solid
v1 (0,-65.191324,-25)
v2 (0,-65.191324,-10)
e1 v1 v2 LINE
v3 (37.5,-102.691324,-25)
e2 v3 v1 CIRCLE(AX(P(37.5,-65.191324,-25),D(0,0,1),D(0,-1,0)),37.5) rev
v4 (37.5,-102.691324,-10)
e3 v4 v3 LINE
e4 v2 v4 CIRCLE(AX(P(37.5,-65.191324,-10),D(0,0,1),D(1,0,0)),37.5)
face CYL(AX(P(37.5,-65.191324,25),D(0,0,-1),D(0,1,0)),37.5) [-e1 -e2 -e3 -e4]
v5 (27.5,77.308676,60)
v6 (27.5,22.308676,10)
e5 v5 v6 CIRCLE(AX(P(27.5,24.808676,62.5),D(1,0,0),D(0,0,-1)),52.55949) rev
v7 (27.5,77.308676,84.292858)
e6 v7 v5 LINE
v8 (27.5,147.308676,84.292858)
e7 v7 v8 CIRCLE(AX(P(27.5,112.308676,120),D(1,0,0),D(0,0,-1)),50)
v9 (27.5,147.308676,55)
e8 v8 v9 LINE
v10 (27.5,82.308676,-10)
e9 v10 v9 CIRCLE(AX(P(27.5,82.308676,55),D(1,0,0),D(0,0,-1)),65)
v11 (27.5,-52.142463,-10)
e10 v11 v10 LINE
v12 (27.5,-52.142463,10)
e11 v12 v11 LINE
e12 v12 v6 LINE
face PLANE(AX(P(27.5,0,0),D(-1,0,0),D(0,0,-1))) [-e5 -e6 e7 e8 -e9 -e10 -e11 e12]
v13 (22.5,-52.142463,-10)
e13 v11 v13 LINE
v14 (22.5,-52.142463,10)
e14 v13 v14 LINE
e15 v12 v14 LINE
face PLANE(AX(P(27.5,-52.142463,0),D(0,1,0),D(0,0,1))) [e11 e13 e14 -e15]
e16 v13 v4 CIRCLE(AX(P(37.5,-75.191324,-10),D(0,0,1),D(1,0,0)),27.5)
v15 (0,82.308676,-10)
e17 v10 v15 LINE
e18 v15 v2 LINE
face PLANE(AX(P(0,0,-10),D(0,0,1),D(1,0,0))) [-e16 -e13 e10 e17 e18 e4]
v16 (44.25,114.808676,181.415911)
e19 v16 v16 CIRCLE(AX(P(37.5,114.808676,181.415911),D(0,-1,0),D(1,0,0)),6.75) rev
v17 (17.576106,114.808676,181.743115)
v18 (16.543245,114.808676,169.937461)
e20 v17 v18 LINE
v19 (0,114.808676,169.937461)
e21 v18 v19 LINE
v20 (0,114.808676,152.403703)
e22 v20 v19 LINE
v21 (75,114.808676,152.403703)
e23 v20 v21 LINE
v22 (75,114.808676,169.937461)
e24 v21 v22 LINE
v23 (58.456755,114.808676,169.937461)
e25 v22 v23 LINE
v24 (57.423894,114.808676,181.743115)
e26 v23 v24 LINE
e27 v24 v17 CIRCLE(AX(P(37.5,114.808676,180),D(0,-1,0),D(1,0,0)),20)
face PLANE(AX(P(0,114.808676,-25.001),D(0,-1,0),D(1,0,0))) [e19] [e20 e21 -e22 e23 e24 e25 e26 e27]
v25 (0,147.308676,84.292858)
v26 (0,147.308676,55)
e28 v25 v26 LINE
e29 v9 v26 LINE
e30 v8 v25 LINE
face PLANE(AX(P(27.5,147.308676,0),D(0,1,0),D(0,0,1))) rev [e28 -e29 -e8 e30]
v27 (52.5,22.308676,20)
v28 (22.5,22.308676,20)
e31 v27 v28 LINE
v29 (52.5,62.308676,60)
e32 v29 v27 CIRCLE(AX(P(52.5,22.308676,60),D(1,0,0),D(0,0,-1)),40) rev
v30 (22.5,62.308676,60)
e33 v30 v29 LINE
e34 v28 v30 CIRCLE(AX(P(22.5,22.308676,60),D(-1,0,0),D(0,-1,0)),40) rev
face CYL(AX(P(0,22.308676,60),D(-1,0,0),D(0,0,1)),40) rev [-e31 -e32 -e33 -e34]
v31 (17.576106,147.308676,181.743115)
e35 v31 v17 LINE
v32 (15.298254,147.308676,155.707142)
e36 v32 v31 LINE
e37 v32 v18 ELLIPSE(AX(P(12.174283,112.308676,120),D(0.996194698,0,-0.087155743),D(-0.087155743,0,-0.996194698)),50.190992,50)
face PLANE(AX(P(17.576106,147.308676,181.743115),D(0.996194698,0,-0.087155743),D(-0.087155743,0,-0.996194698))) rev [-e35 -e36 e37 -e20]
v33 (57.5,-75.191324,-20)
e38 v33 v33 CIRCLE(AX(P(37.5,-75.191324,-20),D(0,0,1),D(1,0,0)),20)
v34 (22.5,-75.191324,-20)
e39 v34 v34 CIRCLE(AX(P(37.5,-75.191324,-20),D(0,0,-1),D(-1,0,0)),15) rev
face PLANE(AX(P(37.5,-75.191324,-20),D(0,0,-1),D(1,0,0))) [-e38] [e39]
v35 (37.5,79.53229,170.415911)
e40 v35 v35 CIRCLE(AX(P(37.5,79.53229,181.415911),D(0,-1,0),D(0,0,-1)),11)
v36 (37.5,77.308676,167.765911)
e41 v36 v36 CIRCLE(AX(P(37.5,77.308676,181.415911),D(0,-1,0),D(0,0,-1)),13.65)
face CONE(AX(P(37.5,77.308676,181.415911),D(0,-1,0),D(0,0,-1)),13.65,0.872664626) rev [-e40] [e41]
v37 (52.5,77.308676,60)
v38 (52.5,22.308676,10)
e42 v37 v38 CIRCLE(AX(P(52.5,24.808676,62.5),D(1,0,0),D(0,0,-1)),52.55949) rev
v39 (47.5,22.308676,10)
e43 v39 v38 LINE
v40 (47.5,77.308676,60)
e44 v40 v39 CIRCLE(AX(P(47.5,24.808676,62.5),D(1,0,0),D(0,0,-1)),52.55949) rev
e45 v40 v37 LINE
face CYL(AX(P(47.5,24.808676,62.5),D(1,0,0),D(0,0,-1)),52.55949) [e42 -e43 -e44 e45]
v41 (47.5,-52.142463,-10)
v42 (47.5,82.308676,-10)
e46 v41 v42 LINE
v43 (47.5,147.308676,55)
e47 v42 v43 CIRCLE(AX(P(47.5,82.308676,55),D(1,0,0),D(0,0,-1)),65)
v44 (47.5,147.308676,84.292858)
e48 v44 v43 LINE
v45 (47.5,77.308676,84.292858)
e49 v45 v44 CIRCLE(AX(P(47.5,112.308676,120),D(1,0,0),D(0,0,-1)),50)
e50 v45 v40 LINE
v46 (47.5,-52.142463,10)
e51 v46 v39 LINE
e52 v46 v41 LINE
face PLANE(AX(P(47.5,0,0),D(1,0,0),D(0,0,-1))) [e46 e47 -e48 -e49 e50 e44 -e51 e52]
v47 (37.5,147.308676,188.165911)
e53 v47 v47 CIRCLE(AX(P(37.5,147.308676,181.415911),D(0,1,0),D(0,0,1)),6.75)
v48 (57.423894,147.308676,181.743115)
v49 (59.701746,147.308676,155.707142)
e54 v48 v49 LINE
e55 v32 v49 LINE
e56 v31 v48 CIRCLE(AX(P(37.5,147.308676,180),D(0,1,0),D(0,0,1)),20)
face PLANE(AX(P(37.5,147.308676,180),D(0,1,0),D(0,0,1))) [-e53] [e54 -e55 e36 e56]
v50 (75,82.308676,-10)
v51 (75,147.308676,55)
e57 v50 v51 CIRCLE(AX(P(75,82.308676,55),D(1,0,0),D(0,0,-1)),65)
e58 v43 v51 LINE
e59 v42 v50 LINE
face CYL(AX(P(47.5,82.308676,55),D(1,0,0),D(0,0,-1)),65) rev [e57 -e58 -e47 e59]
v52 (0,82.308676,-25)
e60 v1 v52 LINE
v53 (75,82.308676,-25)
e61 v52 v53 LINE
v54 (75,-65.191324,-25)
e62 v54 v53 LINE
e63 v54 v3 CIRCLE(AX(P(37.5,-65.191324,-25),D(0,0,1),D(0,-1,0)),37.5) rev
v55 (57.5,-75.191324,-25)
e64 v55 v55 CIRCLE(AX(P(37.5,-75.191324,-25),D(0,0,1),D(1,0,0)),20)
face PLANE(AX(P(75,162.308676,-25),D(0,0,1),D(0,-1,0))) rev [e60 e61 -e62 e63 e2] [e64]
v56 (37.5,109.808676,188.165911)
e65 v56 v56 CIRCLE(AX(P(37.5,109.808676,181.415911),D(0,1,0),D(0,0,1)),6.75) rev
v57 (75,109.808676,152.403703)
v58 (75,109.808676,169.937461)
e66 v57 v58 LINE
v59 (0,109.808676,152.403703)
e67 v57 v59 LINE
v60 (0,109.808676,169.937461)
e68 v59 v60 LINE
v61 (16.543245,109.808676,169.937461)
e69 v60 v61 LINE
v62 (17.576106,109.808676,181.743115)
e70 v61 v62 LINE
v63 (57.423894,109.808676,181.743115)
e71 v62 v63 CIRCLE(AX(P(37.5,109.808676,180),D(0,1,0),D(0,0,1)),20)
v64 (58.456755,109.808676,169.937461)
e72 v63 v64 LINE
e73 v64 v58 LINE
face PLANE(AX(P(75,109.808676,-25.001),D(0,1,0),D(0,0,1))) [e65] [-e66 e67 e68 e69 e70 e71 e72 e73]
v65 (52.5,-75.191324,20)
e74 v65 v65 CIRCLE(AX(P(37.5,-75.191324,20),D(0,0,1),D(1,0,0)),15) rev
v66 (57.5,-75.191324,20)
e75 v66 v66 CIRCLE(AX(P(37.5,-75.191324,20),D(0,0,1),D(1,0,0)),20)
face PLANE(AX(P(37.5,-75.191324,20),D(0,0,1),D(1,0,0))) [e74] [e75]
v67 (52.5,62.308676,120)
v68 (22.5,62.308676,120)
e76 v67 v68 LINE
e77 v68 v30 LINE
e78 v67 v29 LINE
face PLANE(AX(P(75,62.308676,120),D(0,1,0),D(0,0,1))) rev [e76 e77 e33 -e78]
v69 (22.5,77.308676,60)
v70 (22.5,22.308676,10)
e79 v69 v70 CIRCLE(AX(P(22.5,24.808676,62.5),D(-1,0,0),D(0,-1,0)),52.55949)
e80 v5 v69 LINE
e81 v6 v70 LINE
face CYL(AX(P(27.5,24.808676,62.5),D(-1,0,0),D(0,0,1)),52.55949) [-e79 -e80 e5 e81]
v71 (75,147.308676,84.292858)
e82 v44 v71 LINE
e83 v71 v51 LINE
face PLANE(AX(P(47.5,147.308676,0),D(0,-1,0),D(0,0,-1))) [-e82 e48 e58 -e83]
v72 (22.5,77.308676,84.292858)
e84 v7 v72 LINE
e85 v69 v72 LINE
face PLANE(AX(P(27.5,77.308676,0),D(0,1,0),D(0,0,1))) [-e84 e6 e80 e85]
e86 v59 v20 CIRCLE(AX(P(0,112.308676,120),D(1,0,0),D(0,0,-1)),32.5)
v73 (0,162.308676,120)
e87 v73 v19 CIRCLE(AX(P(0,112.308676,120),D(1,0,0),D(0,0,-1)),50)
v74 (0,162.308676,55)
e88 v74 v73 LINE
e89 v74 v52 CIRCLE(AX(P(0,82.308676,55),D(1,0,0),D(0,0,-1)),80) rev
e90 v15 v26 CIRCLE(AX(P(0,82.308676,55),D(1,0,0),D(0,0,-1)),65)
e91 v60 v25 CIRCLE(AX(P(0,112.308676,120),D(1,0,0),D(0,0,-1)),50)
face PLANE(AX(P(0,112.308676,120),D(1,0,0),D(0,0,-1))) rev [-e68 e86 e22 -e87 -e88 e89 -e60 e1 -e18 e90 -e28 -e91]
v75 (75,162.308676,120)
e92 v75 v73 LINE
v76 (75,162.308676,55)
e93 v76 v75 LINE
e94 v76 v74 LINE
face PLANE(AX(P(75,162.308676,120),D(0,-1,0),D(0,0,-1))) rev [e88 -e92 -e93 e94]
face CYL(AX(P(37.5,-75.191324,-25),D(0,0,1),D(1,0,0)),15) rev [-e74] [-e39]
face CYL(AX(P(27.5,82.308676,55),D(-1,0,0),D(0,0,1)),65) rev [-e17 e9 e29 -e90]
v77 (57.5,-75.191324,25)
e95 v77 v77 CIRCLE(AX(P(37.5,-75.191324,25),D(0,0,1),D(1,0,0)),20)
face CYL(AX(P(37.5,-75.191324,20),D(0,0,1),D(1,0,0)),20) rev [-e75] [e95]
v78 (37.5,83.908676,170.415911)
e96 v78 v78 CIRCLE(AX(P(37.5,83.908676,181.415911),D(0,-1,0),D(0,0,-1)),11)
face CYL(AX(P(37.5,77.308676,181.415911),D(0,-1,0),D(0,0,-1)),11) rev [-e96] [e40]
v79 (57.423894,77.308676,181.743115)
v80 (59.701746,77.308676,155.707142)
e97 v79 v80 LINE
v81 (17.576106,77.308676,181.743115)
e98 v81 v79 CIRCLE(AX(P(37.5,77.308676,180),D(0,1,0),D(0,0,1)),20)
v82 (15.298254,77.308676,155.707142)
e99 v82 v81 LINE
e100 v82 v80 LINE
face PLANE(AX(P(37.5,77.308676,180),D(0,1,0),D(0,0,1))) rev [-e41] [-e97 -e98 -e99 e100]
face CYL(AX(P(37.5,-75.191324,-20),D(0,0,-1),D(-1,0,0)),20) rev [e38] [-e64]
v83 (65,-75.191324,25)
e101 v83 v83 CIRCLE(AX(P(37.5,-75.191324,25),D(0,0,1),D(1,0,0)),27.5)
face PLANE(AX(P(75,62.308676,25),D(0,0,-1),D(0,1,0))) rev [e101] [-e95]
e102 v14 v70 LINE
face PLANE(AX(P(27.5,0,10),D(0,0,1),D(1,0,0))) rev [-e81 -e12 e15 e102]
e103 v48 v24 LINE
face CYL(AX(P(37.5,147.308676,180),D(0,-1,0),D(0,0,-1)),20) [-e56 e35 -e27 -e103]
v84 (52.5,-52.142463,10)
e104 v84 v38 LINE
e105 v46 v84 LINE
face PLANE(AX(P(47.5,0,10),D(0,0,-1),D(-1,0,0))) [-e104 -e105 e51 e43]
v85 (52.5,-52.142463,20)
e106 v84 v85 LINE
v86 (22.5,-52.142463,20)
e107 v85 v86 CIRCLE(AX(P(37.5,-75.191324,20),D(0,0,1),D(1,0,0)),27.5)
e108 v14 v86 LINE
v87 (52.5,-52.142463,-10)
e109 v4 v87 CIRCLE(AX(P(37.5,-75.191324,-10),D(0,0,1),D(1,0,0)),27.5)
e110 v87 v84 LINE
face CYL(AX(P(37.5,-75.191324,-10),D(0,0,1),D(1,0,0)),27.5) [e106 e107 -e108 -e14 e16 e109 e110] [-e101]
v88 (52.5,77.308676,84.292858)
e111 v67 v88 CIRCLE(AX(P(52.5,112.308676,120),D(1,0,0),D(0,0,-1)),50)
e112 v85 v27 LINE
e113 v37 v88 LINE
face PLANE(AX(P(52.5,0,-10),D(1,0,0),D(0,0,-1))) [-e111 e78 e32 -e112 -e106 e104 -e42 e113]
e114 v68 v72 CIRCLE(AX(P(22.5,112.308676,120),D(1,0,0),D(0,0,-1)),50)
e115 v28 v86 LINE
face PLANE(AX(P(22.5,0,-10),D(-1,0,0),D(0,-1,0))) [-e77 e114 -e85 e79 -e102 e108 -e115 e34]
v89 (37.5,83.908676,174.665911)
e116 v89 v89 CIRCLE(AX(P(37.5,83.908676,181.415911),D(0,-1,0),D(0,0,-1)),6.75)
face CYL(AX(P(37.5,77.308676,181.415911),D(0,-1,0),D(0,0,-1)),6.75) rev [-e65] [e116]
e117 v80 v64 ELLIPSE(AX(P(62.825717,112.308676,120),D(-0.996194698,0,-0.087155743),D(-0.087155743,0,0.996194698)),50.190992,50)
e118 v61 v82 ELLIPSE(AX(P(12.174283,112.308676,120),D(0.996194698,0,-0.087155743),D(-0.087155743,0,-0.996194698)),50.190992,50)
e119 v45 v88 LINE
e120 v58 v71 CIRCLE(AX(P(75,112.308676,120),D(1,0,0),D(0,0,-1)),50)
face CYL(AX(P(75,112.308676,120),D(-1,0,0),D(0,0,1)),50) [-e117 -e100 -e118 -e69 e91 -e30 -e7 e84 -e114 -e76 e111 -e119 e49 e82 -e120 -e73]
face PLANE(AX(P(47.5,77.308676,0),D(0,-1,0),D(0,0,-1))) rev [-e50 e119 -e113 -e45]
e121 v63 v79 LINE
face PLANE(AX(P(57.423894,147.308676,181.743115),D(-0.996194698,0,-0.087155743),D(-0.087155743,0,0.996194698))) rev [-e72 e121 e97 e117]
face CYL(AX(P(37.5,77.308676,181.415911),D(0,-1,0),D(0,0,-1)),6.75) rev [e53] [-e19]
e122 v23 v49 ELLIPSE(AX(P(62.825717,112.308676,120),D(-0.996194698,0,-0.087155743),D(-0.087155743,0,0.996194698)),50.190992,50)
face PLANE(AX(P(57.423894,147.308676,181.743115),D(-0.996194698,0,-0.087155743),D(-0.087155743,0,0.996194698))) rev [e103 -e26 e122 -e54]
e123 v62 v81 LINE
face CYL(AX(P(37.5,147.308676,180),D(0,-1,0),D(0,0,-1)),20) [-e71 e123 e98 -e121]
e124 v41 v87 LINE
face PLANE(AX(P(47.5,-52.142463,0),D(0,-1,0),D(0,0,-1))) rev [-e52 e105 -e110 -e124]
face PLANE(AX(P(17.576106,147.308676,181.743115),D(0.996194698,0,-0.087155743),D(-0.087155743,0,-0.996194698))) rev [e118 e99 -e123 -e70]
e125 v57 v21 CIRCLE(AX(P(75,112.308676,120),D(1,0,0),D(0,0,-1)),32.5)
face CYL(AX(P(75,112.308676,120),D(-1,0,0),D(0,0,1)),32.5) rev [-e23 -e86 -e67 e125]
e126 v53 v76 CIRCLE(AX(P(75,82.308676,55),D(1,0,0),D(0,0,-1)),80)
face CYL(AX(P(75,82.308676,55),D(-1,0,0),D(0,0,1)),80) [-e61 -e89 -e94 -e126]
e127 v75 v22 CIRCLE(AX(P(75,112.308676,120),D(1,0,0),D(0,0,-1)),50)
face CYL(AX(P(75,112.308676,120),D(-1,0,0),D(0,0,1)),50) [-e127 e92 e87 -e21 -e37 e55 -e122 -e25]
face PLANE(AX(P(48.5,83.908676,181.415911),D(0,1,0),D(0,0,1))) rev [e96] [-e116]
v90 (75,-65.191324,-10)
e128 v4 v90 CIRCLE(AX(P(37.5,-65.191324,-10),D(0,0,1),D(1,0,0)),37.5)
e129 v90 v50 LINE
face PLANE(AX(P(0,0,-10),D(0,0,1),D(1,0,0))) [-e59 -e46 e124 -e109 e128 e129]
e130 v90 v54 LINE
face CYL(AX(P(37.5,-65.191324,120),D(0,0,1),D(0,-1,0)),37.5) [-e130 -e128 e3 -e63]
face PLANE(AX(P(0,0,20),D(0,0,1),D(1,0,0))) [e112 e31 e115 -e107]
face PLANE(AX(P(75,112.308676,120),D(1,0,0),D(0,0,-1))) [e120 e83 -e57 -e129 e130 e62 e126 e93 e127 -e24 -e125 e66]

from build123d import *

# Parameters (mm, degrees)
SKETCH1_R                = 32.5
BOSS_EXTRUDE1_DEPTH      = 75
FILLET1_R                = 80
CUT_EXTRUDE3_DEPTH       = 35
FILLET2_R                = 37.5
CUT_EXTRUDE13_DEPTH      = 5
FILLET6_R                = 40
CUT_EXTRUDE14_START      = -27.5
CUT_EXTRUDE14_DEPTH      = 27.5
CUT_EXTRUDE15_START      = -22.5
CUT_EXTRUDE15_DEPTH      = 22.5
SKETCH9_R                = 15
CUT_EXTRUDE16_DEPTH      = 231.204488166
SKETCH10_R               = 20
CUT_EXTRUDE17_DEPTH      = 5
BOSS_EXTRUDE2_DEPTH      = 70
CUT_EXTRUDE20_REACH      = 289.392
CUT_EXTRUDE20_END_RADIUS = 32.5
SKETCH18_W               = 75
SKETCH18_H               = 5


with BuildPart() as part:
    # Sketch1 → Boss-Extrude1 (new body)
    with BuildSketch(Plane.YZ):
        with BuildLine():
            Line((162.308676206, -25), (-102.691323794, -25))
            Line((-102.691323794, -25), (-102.691323794, 25))
            Line((-102.691323794, 25), (62.308676206, 25))
            Line((62.308676206, 25), (62.308676206, 120))
            ThreePointArc((62.308676206, 120), (112.308676206, 170), (162.308676206, 120))
            Line((162.308676206, 120), (162.308676206, -25))
        make_face()
        with Locations(Location((112.308676206, 120, 0), (0, 0, 270))):
            Circle(SKETCH1_R, mode=Mode.SUBTRACT)
    extrude(amount=BOSS_EXTRUDE1_DEPTH)

    # Fillet1
    fillet1_edges = [part.edges().sort_by_distance(p)[0] for p in [
        (37.5, 162.308676206, -25),
    ]]
    fillet(fillet1_edges, radius=FILLET1_R)

    # Sketch3 → Cut-Extrude3 (cut)
    with BuildSketch(Plane.XY.offset(25)):
        with BuildLine():
            Line((75, 62.308676206), (52.5, 62.308676206))
            Line((52.5, 62.308676206), (52.5, -52.14246265))
            ThreePointArc((52.5, -52.14246265), (61.673849507, -62.081213191), (65, -75.191323794))
            ThreePointArc((65, -75.191323794), (56.945436483, -94.636760276), (37.5, -102.691323794))
            Line((37.5, -102.691323794), (75, -102.691323794))
            Line((75, -102.691323794), (75, 62.308676206))
        make_face()
        with BuildLine():
            Line((22.5, -52.14246265), (22.5, 62.308676206))
            Line((22.5, 62.308676206), (0, 62.308676206))
            Line((0, 62.308676206), (0, -102.691323794))
            Line((0, -102.691323794), (37.5, -102.691323794))
            ThreePointArc((37.5, -102.691323794), (11.136258977, -83.014568599), (22.5, -52.14246265))
        make_face()
    extrude(amount=-CUT_EXTRUDE3_DEPTH, mode=Mode.SUBTRACT)

    # Fillet2
    fillet2_edges = [part.edges().sort_by_distance(p)[0] for p in [
        (0, -102.691323794, -17.5),
        (75, -102.691323794, -17.5),
    ]]
    fillet(fillet2_edges, radius=FILLET2_R - 0.0001)  # a hair under: the kernel refuses the full size

    # Sketch7 → Cut-Extrude13 (cut)
    with BuildSketch(Plane.XY.offset(25)):
        with BuildLine():
            Line((52.5, 62.308676206), (22.5, 62.308676206))
            Line((22.5, 62.308676206), (22.5, -52.14246265))
            ThreePointArc((22.5, -52.14246265), (37.5, -47.691323794), (52.5, -52.14246265))
            Line((52.5, -52.14246265), (52.5, 62.308676206))
        make_face()
    extrude(amount=-CUT_EXTRUDE13_DEPTH, mode=Mode.SUBTRACT)

    # Fillet6
    fillet6_edges = [part.edges().sort_by_distance(p)[0] for p in [
        (37.5, 62.308676206, 20),
    ]]
    fillet(fillet6_edges, radius=FILLET6_R)

    # Sketch5 → Cut-Extrude14 (cut)
    with BuildSketch(Plane.YZ.offset(75).offset(CUT_EXTRUDE14_START)):
        with BuildLine():
            ThreePointArc((77.308676206, 60), (72.970807341, 41.454593742), (62.308676206, 25.672700343))
            Line((62.308676206, 25.672700343), (62.308676206, 25))
            Line((62.308676206, 25), (62.308676206, -10))
            Line((62.308676206, -10), (82.308676206, -10))
            ThreePointArc((82.308676206, -10), (128.270616984, 9.038059223), (147.308676206, 55))
            Line((147.308676206, 55), (147.308676206, 84.292857857))
            ThreePointArc((147.308676206, 84.292857857), (112.308676206, 70), (77.308676206, 84.292857857))
            Line((77.308676206, 84.292857857), (77.308676206, 60))
        make_face()
        with BuildLine():
            Line((22.308676206, 10), (-52.14246265, 10))
            Line((-52.14246265, 10), (-52.14246265, -10))
            Line((-52.14246265, -10), (62.308676206, -10))
            Line((62.308676206, -10), (62.308676206, 25))
            Line((62.308676206, 25), (62.308676206, 25.672700343))
            ThreePointArc((62.308676206, 25.672700343), (43.98309625, 13.562881), (22.308676206, 10))
        make_face()
    cut_extrude14 = extrude(amount=CUT_EXTRUDE14_DEPTH, mode=Mode.SUBTRACT)

    # Sketch8 → Cut-Extrude15 (cut)
    with BuildSketch(Plane.YZ.offset(75).offset(CUT_EXTRUDE15_START)):
        with BuildLine():
            ThreePointArc((62.308676206, 120), (66.21095392, 100.635083269), (77.308676206, 84.292857857))
            Line((77.308676206, 84.292857857), (77.308676206, 60))
            ThreePointArc((77.308676206, 60), (72.970807341, 41.454593742), (62.308676206, 25.672700343))
            Line((62.308676206, 25.672700343), (62.308676206, 120))
        make_face()
    cut_extrude15 = extrude(amount=CUT_EXTRUDE15_DEPTH, mode=Mode.SUBTRACT)

    # Mirror2: Cut-Extrude14, Cut-Extrude15 across plane
    add(cut_extrude14.mirror(Plane(origin=(37.5, 0, 0), x_dir=(0, 0, 1), z_dir=(1, 0, 0))), mode=Mode.SUBTRACT)
    add(cut_extrude15.mirror(Plane(origin=(37.5, 0, 0), x_dir=(0, 0, 1), z_dir=(1, 0, 0))), mode=Mode.SUBTRACT)

    # Sketch9 → Cut-Extrude16 (cut, through all)
    with BuildSketch(Plane.XY.offset(25)):
        with Locations((37.5, -75.191323794)):
            Circle(SKETCH9_R)
    cut_extrude16 = extrude(amount=-CUT_EXTRUDE16_DEPTH, mode=Mode.SUBTRACT)

    # Sketch10 → Cut-Extrude17 (cut)
    with BuildSketch(Plane.XY.offset(25)):
        with Locations((37.5, -75.191323794)):
            Circle(SKETCH10_R)
    cut_extrude17 = extrude(amount=-CUT_EXTRUDE17_DEPTH, mode=Mode.SUBTRACT)

    # Mirror3: Cut-Extrude16, Cut-Extrude17 across plane
    add(cut_extrude16.mirror(Plane.XY), mode=Mode.SUBTRACT)
    add(cut_extrude17.mirror(Plane.XY), mode=Mode.SUBTRACT)

    # Sketch13 → Boss-Extrude2 (add)
    with BuildSketch(Plane(origin=(0, 77.30867621, 0), x_dir=(-1, 0, 0), z_dir=(0, 1, 0))):
        with BuildLine():
            Line((-57.423893962, 181.743114855), (-59.932978613, 153.06414606))
            Line((-59.932978613, 153.06414606), (-15.067021387, 153.06414606))
            Line((-15.067021387, 153.06414606), (-17.576106038, 181.743114855))
            ThreePointArc((-17.576106038, 181.743114855), (-37.5, 200), (-57.423893962, 181.743114855))
        make_face()
    extrude(amount=BOSS_EXTRUDE2_DEPTH)

    # Sketch20 → CBORE for M14 Hex Head Cap Screw1 (revolve, cut)
    with BuildSketch(Plane(origin=(37.5, 77.30867621, 181.415910965), x_dir=(0, 0, -1), z_dir=(1, 0, 0))):
        Polygon((0, 0), (0, 84.999999996), (6.75, 84.999999996), (6.75, 6.6), (11, 6.6), (11, 2.223614023), (13.65, 0), align=None)
    revolve(axis=Axis((37.5, 70.95867621, 181.415910965), (0, 1, 0)), mode=Mode.SUBTRACT)

    # Cut-Extrude20: up to this cylinder (the profile starts outside it)
    cut_extrude20_end = Plane(origin=(37.5, 112.308676206, 120), z_dir=(-1, 0, 0)) * Cylinder(CUT_EXTRUDE20_END_RADIUS, 644.784, mode=Mode.PRIVATE)
    # Sketch18 → Cut-Extrude20 (cut, up to the surface)
    with BuildSketch(Plane(origin=(0, 0, 200), x_dir=(-1, 0, 0), z_dir=(0, 0, -1)), mode=Mode.PRIVATE) as cut_extrude20_sk1:
        with Locations((-37.5, 112.308676206)):
            Rectangle(SKETCH18_W, SKETCH18_H)
    cut_extrude20_tool1 = extrude(cut_extrude20_sk1.sketch, amount=CUT_EXTRUDE20_REACH, mode=Mode.PRIVATE) - cut_extrude20_end
    add(cut_extrude20_tool1.solids().sort_by_distance((37.5, 112.308676, 200))[0], mode=Mode.SUBTRACT)


solid = part.part
